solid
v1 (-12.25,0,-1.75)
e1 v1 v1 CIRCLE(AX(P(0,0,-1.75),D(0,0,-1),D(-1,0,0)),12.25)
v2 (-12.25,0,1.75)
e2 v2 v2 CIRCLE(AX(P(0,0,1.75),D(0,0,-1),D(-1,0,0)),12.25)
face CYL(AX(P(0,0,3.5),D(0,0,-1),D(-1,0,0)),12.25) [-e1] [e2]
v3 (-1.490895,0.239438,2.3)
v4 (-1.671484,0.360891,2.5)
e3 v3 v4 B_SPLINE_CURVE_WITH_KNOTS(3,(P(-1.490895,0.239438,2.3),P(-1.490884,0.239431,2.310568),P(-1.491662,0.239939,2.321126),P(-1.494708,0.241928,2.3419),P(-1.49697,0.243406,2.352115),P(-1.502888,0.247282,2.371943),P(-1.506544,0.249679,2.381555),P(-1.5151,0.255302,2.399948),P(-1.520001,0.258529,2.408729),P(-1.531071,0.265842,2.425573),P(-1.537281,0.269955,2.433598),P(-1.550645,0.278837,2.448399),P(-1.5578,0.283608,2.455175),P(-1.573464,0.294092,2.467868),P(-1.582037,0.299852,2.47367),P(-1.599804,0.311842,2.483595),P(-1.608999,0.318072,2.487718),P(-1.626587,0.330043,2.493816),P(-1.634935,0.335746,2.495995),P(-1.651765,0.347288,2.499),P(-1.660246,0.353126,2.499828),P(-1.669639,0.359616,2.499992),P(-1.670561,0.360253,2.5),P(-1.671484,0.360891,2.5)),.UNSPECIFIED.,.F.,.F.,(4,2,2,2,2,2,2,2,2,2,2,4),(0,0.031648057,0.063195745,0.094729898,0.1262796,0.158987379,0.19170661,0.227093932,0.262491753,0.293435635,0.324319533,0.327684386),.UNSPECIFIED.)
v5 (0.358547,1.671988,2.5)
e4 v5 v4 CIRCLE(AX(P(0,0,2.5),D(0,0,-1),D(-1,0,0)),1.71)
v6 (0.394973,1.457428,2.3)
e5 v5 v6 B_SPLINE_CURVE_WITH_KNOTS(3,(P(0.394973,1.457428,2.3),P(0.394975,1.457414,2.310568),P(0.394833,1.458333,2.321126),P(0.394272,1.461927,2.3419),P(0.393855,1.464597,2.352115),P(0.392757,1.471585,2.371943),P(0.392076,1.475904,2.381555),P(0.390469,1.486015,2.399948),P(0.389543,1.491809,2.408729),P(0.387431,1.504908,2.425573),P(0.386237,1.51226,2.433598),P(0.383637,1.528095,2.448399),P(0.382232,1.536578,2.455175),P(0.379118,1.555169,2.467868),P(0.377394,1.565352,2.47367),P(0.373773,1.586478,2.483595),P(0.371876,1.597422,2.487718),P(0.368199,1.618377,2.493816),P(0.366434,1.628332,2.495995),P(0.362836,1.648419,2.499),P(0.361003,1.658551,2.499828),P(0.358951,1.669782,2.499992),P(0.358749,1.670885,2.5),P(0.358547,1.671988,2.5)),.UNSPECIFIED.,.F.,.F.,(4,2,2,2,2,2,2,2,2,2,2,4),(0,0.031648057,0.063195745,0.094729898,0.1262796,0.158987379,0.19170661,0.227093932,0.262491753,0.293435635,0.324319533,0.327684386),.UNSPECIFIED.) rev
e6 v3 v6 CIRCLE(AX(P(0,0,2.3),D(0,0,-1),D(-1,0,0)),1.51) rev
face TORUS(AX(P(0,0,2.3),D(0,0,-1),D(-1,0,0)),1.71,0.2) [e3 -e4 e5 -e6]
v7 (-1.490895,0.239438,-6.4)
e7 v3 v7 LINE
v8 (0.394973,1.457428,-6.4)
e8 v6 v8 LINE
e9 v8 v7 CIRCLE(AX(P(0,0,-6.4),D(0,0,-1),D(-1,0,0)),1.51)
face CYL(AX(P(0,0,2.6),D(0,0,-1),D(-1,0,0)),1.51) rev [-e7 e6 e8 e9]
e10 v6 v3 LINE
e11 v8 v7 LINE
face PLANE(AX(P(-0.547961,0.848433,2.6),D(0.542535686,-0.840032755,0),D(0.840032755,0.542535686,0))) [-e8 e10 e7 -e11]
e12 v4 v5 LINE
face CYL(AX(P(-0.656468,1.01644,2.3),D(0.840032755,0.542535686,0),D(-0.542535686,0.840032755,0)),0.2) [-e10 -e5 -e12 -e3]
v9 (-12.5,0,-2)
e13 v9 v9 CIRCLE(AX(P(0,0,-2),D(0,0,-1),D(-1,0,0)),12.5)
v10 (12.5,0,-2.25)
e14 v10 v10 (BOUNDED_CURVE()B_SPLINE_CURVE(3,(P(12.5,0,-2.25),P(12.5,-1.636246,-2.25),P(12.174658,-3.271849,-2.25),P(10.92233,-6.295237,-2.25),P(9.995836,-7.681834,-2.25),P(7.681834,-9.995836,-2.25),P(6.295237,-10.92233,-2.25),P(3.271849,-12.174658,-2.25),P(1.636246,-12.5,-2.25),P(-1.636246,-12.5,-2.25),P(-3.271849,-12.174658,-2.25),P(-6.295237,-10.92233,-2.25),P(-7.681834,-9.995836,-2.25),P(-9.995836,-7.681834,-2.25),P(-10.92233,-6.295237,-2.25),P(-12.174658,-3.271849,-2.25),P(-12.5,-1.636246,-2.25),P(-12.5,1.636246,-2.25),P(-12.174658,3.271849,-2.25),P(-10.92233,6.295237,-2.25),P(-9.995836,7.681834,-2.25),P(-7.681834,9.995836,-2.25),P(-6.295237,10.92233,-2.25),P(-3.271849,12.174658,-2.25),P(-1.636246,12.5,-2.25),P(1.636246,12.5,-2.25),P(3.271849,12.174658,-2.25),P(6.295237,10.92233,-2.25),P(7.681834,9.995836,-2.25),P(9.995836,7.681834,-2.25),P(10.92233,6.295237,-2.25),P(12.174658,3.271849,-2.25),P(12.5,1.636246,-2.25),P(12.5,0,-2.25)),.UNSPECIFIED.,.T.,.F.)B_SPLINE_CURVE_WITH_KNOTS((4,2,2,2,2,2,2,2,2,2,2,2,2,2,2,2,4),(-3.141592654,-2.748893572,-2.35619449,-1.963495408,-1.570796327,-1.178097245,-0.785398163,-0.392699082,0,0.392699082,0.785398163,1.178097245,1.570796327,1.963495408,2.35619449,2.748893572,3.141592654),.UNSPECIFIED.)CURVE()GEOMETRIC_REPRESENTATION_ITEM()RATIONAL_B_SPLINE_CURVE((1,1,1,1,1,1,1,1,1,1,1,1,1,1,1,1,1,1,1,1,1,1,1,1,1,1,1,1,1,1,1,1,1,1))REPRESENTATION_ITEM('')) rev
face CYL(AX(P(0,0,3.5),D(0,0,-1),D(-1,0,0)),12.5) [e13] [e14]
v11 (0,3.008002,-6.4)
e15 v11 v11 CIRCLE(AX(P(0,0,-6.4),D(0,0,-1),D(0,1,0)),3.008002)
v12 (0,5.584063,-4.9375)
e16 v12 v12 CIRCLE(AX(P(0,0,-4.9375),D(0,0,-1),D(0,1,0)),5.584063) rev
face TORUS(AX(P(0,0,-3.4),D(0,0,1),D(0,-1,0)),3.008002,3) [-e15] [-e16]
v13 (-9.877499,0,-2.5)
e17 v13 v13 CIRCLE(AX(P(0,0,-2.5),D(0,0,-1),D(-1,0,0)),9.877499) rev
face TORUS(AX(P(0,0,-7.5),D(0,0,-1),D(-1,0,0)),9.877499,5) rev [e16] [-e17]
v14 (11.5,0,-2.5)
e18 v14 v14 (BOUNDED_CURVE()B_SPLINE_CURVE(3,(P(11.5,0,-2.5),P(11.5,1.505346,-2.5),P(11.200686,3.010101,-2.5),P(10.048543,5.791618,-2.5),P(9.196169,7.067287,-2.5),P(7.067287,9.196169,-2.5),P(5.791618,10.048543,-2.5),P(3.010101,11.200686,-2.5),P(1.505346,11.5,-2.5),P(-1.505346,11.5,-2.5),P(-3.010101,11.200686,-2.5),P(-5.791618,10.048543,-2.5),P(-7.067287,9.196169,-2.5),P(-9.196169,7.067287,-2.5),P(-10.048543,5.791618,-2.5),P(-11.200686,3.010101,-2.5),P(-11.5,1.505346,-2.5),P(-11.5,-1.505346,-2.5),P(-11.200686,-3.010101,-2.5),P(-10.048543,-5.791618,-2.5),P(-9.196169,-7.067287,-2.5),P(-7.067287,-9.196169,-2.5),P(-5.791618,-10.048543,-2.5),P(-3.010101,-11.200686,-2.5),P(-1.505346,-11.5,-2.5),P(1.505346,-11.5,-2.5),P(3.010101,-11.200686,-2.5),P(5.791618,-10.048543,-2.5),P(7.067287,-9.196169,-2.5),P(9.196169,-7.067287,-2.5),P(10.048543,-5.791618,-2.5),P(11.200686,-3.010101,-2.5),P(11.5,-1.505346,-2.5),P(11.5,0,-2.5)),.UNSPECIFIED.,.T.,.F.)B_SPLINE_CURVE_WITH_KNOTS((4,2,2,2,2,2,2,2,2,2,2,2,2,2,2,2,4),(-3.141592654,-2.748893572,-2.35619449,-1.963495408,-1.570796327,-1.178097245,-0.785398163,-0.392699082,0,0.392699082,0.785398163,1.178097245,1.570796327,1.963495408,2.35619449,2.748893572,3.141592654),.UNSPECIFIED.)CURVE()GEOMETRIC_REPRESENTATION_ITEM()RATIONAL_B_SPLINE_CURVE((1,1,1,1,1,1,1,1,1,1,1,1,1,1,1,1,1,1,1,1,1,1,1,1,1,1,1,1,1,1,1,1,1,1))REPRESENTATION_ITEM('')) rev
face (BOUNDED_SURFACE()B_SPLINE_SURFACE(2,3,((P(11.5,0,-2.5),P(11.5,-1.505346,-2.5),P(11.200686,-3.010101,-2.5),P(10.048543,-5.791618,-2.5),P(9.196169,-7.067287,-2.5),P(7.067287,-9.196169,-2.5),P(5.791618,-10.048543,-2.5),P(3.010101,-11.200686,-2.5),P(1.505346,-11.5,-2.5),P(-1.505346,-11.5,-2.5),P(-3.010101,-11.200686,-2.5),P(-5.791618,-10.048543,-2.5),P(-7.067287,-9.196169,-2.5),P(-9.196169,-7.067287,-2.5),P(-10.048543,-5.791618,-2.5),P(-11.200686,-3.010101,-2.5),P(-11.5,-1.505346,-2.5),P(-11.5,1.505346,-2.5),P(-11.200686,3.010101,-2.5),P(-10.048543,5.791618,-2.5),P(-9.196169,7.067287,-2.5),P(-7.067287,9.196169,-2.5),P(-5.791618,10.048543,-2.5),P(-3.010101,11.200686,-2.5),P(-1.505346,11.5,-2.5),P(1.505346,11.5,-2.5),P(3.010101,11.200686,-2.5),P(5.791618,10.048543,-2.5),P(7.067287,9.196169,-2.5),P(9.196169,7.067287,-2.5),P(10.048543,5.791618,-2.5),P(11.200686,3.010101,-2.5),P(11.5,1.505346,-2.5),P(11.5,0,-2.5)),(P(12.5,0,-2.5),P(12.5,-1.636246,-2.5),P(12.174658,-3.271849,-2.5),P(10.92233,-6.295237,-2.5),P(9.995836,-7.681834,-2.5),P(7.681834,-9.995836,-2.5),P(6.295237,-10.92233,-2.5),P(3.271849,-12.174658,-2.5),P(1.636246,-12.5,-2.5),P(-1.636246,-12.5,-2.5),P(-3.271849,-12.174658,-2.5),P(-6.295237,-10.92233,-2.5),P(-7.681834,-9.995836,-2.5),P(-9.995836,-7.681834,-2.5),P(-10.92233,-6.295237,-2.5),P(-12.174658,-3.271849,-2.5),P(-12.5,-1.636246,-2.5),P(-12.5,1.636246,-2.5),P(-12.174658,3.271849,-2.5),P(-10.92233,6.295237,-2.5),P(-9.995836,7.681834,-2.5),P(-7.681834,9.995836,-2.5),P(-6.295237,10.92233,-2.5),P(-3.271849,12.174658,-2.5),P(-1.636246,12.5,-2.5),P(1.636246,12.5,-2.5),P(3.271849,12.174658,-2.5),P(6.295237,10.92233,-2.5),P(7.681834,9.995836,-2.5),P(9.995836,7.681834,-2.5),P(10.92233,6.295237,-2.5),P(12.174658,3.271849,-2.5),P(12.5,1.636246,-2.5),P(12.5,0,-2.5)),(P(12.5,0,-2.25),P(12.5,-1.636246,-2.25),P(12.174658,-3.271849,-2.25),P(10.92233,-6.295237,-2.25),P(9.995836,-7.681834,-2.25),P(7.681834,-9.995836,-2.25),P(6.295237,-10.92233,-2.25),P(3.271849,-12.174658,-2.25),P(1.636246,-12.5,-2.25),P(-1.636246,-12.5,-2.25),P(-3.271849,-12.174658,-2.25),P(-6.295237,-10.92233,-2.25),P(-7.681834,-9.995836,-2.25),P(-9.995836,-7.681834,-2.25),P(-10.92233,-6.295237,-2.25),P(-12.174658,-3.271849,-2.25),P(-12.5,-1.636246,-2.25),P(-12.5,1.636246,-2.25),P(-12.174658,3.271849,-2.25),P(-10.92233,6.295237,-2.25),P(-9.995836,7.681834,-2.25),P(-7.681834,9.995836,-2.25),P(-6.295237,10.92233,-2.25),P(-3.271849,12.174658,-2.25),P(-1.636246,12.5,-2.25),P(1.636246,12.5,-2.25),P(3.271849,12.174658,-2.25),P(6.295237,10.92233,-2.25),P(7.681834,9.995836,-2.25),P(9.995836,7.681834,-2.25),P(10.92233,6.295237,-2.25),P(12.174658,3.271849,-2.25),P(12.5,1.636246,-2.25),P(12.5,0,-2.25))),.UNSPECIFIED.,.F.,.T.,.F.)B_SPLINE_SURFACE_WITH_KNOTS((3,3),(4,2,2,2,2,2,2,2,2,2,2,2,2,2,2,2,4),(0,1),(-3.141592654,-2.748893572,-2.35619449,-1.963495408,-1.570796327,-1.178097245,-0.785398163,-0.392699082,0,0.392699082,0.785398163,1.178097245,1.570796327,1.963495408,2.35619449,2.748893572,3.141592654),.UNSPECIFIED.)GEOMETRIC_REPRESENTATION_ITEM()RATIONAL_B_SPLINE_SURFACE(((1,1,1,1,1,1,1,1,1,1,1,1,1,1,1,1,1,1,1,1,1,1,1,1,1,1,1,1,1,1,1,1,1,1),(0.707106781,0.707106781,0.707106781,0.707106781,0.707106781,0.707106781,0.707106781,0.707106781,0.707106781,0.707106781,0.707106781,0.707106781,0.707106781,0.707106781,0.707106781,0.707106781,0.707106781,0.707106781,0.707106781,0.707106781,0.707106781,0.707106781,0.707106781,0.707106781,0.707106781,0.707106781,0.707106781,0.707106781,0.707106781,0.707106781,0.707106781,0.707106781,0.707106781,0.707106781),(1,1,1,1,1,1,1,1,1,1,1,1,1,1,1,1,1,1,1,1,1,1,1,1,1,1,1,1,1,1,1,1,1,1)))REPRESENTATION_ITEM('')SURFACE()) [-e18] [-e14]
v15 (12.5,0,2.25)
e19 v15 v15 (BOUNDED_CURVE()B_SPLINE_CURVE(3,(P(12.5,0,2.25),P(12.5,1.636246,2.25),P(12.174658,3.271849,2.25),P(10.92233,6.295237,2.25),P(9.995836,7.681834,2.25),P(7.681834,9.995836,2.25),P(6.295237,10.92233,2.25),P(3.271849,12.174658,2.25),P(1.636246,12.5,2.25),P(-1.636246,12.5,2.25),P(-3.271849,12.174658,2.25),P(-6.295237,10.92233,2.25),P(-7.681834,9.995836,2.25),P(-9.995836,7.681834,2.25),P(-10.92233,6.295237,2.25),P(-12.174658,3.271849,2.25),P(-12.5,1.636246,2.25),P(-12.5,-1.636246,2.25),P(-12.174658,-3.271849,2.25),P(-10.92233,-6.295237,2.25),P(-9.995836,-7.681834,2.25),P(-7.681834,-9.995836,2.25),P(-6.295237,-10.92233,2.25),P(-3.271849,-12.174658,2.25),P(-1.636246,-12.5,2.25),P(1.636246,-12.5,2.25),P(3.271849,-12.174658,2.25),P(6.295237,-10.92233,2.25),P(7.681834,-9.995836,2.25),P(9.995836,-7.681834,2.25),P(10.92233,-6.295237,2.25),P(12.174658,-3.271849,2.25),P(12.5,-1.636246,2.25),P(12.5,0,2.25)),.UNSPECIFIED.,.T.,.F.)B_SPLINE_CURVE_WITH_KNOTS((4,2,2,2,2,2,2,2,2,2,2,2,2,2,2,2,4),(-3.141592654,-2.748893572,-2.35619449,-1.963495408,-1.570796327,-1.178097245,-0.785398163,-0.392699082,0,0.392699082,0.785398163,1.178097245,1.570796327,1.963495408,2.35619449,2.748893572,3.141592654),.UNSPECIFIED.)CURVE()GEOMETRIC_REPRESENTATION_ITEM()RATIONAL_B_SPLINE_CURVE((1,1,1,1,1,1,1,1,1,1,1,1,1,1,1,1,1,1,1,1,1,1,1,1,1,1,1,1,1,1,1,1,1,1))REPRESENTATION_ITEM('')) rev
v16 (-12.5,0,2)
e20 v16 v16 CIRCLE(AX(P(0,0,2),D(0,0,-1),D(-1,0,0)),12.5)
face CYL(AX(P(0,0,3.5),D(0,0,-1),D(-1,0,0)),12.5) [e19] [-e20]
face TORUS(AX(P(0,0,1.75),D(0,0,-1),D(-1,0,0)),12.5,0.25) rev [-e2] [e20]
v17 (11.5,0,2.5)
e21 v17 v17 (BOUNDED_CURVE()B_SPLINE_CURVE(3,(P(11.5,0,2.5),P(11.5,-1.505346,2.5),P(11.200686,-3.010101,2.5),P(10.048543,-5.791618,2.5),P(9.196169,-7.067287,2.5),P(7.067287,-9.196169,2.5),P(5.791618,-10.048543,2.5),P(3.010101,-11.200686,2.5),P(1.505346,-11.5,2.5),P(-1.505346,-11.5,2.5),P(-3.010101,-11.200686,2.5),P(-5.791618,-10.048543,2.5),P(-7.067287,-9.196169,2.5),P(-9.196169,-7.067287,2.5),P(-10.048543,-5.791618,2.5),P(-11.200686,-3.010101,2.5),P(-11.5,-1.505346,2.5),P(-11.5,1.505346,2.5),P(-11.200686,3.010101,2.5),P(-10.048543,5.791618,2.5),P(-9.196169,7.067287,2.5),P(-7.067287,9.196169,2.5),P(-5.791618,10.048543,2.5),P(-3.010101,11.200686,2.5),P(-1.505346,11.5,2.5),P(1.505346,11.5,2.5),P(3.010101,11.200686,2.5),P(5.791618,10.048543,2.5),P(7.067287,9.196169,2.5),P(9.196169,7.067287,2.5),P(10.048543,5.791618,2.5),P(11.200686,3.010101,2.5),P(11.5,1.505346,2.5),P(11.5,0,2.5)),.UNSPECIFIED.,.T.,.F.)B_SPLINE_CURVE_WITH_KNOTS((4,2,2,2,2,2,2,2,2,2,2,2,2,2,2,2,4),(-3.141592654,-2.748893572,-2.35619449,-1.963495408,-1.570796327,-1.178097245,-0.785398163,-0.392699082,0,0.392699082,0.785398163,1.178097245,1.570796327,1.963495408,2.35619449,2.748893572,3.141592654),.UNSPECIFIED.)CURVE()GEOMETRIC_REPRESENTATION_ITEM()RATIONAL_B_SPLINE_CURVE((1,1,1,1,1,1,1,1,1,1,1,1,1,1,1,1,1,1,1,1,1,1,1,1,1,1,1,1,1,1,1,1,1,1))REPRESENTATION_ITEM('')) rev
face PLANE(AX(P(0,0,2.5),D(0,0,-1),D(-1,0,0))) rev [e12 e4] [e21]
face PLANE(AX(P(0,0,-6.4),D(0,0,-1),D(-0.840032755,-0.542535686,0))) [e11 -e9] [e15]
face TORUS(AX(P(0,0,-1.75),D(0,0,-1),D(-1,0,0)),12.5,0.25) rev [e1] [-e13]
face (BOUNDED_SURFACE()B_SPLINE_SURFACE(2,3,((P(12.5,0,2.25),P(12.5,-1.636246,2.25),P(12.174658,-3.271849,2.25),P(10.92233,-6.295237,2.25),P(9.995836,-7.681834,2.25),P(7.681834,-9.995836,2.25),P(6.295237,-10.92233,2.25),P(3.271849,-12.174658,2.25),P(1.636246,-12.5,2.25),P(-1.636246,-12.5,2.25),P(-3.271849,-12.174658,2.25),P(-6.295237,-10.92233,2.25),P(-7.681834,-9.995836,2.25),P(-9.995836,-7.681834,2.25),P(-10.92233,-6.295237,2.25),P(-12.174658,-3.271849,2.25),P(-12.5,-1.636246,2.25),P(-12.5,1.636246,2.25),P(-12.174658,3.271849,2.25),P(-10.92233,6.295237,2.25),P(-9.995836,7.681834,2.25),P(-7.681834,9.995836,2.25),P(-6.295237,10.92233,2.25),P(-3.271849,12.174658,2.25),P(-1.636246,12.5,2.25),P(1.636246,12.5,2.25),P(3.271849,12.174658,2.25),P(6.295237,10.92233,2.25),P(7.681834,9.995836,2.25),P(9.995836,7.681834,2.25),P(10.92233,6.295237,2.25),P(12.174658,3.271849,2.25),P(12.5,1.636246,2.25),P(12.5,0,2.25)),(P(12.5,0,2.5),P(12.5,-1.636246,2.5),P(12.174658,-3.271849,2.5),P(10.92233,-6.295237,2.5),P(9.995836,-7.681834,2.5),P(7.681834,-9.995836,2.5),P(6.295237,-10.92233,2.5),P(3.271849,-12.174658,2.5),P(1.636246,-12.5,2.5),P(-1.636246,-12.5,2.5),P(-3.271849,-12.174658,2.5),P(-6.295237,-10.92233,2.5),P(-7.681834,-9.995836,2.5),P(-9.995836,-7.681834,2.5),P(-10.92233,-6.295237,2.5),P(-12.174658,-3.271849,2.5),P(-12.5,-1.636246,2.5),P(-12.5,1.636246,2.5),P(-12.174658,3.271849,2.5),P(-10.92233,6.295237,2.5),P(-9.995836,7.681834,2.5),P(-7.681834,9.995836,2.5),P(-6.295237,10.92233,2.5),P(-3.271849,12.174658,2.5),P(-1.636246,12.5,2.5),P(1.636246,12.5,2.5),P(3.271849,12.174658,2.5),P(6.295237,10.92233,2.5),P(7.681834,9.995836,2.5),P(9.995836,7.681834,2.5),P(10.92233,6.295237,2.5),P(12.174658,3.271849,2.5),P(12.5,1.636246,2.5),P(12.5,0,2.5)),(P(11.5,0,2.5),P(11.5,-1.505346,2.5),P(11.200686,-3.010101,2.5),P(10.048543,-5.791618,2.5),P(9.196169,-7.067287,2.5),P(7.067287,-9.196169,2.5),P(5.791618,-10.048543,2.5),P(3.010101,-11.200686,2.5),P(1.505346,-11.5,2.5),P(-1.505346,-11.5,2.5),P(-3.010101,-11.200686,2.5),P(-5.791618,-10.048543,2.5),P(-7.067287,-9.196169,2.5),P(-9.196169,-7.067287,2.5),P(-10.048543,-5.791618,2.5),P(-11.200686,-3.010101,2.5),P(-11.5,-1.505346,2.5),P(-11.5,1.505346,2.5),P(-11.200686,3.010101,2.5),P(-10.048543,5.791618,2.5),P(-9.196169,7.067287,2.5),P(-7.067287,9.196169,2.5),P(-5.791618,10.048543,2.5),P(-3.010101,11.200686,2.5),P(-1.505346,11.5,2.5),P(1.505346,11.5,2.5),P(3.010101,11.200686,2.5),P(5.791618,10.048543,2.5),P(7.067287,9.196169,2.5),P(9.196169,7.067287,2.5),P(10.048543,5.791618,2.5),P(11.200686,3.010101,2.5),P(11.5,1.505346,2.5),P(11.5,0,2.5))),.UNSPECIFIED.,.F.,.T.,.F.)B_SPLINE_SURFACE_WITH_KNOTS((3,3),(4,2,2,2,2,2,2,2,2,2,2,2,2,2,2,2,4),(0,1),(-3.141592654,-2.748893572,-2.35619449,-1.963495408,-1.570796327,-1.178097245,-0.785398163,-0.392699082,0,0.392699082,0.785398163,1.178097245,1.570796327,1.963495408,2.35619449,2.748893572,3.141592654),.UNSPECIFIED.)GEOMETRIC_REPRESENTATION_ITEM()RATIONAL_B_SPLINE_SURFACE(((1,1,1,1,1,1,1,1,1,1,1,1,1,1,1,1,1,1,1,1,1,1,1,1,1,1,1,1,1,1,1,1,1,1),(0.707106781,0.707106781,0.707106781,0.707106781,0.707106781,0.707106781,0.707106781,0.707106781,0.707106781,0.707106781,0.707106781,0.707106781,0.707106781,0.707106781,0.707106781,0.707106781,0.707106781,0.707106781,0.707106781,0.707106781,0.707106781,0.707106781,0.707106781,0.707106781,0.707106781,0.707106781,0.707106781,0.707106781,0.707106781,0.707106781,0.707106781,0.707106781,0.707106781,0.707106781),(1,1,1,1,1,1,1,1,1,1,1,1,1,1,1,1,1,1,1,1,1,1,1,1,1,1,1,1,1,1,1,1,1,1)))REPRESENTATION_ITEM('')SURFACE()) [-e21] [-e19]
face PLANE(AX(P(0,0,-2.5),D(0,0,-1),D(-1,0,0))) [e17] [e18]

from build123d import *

# Parameters (mm, degrees)
FILLET1_SIZE            = 0.25
FILLET1_SIZE_2          = 1
FILLET2_SIZE            = 0.25
FILLET2_SIZE_2          = 1
SKETCH3_R               = 5
BOSS_EXTRUDE1_DEPTH     = 3.9
FILLET4_R               = 5
FILLET5_R               = 3
CUT_EXTRUDE1_DEPTH      = 19.371173234
CUT_EXTRUDE1_DEPTH_BACK = 19.371173234
FILLET3_R               = 0.2


with BuildPart() as part:
    # Sketch1 → Revolve1 (revolve)
    with BuildSketch(Plane(origin=(0, 0, 0), x_dir=(1, 0, 0), z_dir=(0, 1, 0))):
        with BuildLine():
            Line((-12.5, -2.5), (0, -2.5))
            Line((0, -2.5), (0, 2.5))
            Line((0, 2.5), (-12.5, 2.5))
            Line((-12.5, 2.5), (-12.5, 2))
            ThreePointArc((-12.5, 2), (-12.323223305, 1.926776695), (-12.25, 1.75))
            Line((-12.25, 1.75), (-12.25, -1.75))
            ThreePointArc((-12.25, -1.75), (-12.323223305, -1.926776695), (-12.5, -2))
            Line((-12.5, -2), (-12.5, -2.5))
        make_face()
    revolve(axis=Axis((0, 0, 3.5), (0, 0, 1)))

    # Fillet1
    # an asymmetric fillet: 1, 0.25 mm, written as the material it takes off along each edge
    with BuildSketch(Plane(origin=(0, 0, 2.5), x_dir=(-1, 0, 0), z_dir=(0, 1, 0))) as fillet1_piece_1:
        with BuildLine():
            Bezier((12.5, -FILLET1_SIZE), (12.5, 0), (12.5 - FILLET1_SIZE_2, 0), weights=[1, 0.707106781, 1])
            Line((12.5 - FILLET1_SIZE_2, 0), (12.5, 0))
            Line((12.5, 0), (12.5, -FILLET1_SIZE))
        make_face()
    revolve(axis=Axis((0, 0, 2.5), (0, 0, 1)), mode=Mode.SUBTRACT)

    # Fillet2
    # an asymmetric fillet: 1, 0.25 mm, written as the material it takes off along each edge
    with BuildSketch(Plane(origin=(0, 0, -2.5), x_dir=(-1, 0, 0), z_dir=(0, 1, 0))) as fillet2_piece_1:
        with BuildLine():
            Bezier((12.5, FILLET2_SIZE), (12.5, 0), (12.5 - FILLET2_SIZE_2, 0), weights=[1, 0.707106781, 1])
            Line((12.5 - FILLET2_SIZE_2, 0), (12.5, 0))
            Line((12.5, 0), (12.5, FILLET2_SIZE))
        make_face()
    revolve(axis=Axis((0, 0, -2.5), (0, 0, 1)), mode=Mode.SUBTRACT)

    # Sketch3 → Boss-Extrude1 (add)
    with BuildSketch(Plane(origin=(0, 0, -2.5), x_dir=(-1, 0, 0), z_dir=(0, 0, -1))):
        with Locations(Location((0, 0, 0), (0, 0, 90))):
            Circle(SKETCH3_R)
    extrude(amount=BOSS_EXTRUDE1_DEPTH)

    # Fillet4
    # the kernel refuses this fillet: 5 mm, written as the material it adds along each edge
    with BuildSketch(Plane(origin=(0, 0, -2.5), x_dir=(0, 1, 0), z_dir=(-1, 0, 0))) as fillet4_piece_1:
        with BuildLine():
            CenterArc((9.877499359, 5), FILLET4_R, 192.709032994, 77.290967006)
            Line((5, 3.9), (4.902450013, 3.878))
            ThreePointArc((4.902450013, 3.878), (4.9, 1.95), (4.9, 0))
            Line((4.9, 0), (5, -0.1))
            Line((5, -0.1), (9.877499359, -0.1))
            Line((9.877499359, -0.1), (9.877499359, 0))
        make_face()
    revolve(axis=Axis((0, 0, -2.5), (0, 0, -1)))

    # Fillet5
    fillet5_edges = [part.edges().sort_by_distance(p)[0] for p in [
        (0, -5, -6.4),
    ]]
    fillet(fillet5_edges, radius=FILLET5_R)

    # Sketch2 → Cut-Extrude1 (cut, two sides: drawn at the far end of the back side and taken through both)
    with BuildSketch(Plane(origin=(0, 0, -2.5), x_dir=(-1, 0, 0), z_dir=(0, 0, -1)).offset(-CUT_EXTRUDE1_DEPTH_BACK)):
        with BuildLine():
            Line((-0.394973386, 1.45742788), (1.490895472, 0.239438286))
            ThreePointArc((1.490895472, 0.239438286), (-0.819228886, -1.26844946), (-0.394973386, 1.45742788))
        make_face()
    extrude(amount=CUT_EXTRUDE1_DEPTH + CUT_EXTRUDE1_DEPTH_BACK, mode=Mode.SUBTRACT)

    # Fillet3
    fillet3_edges = [part.edges().sort_by_distance(p)[0] for p in [
        (0.819228886, -1.26844946, 2.5),
        (-0.547961043, 0.848433083, 2.5),
    ]]
    fillet(fillet3_edges, radius=FILLET3_R)


solid = part.part
